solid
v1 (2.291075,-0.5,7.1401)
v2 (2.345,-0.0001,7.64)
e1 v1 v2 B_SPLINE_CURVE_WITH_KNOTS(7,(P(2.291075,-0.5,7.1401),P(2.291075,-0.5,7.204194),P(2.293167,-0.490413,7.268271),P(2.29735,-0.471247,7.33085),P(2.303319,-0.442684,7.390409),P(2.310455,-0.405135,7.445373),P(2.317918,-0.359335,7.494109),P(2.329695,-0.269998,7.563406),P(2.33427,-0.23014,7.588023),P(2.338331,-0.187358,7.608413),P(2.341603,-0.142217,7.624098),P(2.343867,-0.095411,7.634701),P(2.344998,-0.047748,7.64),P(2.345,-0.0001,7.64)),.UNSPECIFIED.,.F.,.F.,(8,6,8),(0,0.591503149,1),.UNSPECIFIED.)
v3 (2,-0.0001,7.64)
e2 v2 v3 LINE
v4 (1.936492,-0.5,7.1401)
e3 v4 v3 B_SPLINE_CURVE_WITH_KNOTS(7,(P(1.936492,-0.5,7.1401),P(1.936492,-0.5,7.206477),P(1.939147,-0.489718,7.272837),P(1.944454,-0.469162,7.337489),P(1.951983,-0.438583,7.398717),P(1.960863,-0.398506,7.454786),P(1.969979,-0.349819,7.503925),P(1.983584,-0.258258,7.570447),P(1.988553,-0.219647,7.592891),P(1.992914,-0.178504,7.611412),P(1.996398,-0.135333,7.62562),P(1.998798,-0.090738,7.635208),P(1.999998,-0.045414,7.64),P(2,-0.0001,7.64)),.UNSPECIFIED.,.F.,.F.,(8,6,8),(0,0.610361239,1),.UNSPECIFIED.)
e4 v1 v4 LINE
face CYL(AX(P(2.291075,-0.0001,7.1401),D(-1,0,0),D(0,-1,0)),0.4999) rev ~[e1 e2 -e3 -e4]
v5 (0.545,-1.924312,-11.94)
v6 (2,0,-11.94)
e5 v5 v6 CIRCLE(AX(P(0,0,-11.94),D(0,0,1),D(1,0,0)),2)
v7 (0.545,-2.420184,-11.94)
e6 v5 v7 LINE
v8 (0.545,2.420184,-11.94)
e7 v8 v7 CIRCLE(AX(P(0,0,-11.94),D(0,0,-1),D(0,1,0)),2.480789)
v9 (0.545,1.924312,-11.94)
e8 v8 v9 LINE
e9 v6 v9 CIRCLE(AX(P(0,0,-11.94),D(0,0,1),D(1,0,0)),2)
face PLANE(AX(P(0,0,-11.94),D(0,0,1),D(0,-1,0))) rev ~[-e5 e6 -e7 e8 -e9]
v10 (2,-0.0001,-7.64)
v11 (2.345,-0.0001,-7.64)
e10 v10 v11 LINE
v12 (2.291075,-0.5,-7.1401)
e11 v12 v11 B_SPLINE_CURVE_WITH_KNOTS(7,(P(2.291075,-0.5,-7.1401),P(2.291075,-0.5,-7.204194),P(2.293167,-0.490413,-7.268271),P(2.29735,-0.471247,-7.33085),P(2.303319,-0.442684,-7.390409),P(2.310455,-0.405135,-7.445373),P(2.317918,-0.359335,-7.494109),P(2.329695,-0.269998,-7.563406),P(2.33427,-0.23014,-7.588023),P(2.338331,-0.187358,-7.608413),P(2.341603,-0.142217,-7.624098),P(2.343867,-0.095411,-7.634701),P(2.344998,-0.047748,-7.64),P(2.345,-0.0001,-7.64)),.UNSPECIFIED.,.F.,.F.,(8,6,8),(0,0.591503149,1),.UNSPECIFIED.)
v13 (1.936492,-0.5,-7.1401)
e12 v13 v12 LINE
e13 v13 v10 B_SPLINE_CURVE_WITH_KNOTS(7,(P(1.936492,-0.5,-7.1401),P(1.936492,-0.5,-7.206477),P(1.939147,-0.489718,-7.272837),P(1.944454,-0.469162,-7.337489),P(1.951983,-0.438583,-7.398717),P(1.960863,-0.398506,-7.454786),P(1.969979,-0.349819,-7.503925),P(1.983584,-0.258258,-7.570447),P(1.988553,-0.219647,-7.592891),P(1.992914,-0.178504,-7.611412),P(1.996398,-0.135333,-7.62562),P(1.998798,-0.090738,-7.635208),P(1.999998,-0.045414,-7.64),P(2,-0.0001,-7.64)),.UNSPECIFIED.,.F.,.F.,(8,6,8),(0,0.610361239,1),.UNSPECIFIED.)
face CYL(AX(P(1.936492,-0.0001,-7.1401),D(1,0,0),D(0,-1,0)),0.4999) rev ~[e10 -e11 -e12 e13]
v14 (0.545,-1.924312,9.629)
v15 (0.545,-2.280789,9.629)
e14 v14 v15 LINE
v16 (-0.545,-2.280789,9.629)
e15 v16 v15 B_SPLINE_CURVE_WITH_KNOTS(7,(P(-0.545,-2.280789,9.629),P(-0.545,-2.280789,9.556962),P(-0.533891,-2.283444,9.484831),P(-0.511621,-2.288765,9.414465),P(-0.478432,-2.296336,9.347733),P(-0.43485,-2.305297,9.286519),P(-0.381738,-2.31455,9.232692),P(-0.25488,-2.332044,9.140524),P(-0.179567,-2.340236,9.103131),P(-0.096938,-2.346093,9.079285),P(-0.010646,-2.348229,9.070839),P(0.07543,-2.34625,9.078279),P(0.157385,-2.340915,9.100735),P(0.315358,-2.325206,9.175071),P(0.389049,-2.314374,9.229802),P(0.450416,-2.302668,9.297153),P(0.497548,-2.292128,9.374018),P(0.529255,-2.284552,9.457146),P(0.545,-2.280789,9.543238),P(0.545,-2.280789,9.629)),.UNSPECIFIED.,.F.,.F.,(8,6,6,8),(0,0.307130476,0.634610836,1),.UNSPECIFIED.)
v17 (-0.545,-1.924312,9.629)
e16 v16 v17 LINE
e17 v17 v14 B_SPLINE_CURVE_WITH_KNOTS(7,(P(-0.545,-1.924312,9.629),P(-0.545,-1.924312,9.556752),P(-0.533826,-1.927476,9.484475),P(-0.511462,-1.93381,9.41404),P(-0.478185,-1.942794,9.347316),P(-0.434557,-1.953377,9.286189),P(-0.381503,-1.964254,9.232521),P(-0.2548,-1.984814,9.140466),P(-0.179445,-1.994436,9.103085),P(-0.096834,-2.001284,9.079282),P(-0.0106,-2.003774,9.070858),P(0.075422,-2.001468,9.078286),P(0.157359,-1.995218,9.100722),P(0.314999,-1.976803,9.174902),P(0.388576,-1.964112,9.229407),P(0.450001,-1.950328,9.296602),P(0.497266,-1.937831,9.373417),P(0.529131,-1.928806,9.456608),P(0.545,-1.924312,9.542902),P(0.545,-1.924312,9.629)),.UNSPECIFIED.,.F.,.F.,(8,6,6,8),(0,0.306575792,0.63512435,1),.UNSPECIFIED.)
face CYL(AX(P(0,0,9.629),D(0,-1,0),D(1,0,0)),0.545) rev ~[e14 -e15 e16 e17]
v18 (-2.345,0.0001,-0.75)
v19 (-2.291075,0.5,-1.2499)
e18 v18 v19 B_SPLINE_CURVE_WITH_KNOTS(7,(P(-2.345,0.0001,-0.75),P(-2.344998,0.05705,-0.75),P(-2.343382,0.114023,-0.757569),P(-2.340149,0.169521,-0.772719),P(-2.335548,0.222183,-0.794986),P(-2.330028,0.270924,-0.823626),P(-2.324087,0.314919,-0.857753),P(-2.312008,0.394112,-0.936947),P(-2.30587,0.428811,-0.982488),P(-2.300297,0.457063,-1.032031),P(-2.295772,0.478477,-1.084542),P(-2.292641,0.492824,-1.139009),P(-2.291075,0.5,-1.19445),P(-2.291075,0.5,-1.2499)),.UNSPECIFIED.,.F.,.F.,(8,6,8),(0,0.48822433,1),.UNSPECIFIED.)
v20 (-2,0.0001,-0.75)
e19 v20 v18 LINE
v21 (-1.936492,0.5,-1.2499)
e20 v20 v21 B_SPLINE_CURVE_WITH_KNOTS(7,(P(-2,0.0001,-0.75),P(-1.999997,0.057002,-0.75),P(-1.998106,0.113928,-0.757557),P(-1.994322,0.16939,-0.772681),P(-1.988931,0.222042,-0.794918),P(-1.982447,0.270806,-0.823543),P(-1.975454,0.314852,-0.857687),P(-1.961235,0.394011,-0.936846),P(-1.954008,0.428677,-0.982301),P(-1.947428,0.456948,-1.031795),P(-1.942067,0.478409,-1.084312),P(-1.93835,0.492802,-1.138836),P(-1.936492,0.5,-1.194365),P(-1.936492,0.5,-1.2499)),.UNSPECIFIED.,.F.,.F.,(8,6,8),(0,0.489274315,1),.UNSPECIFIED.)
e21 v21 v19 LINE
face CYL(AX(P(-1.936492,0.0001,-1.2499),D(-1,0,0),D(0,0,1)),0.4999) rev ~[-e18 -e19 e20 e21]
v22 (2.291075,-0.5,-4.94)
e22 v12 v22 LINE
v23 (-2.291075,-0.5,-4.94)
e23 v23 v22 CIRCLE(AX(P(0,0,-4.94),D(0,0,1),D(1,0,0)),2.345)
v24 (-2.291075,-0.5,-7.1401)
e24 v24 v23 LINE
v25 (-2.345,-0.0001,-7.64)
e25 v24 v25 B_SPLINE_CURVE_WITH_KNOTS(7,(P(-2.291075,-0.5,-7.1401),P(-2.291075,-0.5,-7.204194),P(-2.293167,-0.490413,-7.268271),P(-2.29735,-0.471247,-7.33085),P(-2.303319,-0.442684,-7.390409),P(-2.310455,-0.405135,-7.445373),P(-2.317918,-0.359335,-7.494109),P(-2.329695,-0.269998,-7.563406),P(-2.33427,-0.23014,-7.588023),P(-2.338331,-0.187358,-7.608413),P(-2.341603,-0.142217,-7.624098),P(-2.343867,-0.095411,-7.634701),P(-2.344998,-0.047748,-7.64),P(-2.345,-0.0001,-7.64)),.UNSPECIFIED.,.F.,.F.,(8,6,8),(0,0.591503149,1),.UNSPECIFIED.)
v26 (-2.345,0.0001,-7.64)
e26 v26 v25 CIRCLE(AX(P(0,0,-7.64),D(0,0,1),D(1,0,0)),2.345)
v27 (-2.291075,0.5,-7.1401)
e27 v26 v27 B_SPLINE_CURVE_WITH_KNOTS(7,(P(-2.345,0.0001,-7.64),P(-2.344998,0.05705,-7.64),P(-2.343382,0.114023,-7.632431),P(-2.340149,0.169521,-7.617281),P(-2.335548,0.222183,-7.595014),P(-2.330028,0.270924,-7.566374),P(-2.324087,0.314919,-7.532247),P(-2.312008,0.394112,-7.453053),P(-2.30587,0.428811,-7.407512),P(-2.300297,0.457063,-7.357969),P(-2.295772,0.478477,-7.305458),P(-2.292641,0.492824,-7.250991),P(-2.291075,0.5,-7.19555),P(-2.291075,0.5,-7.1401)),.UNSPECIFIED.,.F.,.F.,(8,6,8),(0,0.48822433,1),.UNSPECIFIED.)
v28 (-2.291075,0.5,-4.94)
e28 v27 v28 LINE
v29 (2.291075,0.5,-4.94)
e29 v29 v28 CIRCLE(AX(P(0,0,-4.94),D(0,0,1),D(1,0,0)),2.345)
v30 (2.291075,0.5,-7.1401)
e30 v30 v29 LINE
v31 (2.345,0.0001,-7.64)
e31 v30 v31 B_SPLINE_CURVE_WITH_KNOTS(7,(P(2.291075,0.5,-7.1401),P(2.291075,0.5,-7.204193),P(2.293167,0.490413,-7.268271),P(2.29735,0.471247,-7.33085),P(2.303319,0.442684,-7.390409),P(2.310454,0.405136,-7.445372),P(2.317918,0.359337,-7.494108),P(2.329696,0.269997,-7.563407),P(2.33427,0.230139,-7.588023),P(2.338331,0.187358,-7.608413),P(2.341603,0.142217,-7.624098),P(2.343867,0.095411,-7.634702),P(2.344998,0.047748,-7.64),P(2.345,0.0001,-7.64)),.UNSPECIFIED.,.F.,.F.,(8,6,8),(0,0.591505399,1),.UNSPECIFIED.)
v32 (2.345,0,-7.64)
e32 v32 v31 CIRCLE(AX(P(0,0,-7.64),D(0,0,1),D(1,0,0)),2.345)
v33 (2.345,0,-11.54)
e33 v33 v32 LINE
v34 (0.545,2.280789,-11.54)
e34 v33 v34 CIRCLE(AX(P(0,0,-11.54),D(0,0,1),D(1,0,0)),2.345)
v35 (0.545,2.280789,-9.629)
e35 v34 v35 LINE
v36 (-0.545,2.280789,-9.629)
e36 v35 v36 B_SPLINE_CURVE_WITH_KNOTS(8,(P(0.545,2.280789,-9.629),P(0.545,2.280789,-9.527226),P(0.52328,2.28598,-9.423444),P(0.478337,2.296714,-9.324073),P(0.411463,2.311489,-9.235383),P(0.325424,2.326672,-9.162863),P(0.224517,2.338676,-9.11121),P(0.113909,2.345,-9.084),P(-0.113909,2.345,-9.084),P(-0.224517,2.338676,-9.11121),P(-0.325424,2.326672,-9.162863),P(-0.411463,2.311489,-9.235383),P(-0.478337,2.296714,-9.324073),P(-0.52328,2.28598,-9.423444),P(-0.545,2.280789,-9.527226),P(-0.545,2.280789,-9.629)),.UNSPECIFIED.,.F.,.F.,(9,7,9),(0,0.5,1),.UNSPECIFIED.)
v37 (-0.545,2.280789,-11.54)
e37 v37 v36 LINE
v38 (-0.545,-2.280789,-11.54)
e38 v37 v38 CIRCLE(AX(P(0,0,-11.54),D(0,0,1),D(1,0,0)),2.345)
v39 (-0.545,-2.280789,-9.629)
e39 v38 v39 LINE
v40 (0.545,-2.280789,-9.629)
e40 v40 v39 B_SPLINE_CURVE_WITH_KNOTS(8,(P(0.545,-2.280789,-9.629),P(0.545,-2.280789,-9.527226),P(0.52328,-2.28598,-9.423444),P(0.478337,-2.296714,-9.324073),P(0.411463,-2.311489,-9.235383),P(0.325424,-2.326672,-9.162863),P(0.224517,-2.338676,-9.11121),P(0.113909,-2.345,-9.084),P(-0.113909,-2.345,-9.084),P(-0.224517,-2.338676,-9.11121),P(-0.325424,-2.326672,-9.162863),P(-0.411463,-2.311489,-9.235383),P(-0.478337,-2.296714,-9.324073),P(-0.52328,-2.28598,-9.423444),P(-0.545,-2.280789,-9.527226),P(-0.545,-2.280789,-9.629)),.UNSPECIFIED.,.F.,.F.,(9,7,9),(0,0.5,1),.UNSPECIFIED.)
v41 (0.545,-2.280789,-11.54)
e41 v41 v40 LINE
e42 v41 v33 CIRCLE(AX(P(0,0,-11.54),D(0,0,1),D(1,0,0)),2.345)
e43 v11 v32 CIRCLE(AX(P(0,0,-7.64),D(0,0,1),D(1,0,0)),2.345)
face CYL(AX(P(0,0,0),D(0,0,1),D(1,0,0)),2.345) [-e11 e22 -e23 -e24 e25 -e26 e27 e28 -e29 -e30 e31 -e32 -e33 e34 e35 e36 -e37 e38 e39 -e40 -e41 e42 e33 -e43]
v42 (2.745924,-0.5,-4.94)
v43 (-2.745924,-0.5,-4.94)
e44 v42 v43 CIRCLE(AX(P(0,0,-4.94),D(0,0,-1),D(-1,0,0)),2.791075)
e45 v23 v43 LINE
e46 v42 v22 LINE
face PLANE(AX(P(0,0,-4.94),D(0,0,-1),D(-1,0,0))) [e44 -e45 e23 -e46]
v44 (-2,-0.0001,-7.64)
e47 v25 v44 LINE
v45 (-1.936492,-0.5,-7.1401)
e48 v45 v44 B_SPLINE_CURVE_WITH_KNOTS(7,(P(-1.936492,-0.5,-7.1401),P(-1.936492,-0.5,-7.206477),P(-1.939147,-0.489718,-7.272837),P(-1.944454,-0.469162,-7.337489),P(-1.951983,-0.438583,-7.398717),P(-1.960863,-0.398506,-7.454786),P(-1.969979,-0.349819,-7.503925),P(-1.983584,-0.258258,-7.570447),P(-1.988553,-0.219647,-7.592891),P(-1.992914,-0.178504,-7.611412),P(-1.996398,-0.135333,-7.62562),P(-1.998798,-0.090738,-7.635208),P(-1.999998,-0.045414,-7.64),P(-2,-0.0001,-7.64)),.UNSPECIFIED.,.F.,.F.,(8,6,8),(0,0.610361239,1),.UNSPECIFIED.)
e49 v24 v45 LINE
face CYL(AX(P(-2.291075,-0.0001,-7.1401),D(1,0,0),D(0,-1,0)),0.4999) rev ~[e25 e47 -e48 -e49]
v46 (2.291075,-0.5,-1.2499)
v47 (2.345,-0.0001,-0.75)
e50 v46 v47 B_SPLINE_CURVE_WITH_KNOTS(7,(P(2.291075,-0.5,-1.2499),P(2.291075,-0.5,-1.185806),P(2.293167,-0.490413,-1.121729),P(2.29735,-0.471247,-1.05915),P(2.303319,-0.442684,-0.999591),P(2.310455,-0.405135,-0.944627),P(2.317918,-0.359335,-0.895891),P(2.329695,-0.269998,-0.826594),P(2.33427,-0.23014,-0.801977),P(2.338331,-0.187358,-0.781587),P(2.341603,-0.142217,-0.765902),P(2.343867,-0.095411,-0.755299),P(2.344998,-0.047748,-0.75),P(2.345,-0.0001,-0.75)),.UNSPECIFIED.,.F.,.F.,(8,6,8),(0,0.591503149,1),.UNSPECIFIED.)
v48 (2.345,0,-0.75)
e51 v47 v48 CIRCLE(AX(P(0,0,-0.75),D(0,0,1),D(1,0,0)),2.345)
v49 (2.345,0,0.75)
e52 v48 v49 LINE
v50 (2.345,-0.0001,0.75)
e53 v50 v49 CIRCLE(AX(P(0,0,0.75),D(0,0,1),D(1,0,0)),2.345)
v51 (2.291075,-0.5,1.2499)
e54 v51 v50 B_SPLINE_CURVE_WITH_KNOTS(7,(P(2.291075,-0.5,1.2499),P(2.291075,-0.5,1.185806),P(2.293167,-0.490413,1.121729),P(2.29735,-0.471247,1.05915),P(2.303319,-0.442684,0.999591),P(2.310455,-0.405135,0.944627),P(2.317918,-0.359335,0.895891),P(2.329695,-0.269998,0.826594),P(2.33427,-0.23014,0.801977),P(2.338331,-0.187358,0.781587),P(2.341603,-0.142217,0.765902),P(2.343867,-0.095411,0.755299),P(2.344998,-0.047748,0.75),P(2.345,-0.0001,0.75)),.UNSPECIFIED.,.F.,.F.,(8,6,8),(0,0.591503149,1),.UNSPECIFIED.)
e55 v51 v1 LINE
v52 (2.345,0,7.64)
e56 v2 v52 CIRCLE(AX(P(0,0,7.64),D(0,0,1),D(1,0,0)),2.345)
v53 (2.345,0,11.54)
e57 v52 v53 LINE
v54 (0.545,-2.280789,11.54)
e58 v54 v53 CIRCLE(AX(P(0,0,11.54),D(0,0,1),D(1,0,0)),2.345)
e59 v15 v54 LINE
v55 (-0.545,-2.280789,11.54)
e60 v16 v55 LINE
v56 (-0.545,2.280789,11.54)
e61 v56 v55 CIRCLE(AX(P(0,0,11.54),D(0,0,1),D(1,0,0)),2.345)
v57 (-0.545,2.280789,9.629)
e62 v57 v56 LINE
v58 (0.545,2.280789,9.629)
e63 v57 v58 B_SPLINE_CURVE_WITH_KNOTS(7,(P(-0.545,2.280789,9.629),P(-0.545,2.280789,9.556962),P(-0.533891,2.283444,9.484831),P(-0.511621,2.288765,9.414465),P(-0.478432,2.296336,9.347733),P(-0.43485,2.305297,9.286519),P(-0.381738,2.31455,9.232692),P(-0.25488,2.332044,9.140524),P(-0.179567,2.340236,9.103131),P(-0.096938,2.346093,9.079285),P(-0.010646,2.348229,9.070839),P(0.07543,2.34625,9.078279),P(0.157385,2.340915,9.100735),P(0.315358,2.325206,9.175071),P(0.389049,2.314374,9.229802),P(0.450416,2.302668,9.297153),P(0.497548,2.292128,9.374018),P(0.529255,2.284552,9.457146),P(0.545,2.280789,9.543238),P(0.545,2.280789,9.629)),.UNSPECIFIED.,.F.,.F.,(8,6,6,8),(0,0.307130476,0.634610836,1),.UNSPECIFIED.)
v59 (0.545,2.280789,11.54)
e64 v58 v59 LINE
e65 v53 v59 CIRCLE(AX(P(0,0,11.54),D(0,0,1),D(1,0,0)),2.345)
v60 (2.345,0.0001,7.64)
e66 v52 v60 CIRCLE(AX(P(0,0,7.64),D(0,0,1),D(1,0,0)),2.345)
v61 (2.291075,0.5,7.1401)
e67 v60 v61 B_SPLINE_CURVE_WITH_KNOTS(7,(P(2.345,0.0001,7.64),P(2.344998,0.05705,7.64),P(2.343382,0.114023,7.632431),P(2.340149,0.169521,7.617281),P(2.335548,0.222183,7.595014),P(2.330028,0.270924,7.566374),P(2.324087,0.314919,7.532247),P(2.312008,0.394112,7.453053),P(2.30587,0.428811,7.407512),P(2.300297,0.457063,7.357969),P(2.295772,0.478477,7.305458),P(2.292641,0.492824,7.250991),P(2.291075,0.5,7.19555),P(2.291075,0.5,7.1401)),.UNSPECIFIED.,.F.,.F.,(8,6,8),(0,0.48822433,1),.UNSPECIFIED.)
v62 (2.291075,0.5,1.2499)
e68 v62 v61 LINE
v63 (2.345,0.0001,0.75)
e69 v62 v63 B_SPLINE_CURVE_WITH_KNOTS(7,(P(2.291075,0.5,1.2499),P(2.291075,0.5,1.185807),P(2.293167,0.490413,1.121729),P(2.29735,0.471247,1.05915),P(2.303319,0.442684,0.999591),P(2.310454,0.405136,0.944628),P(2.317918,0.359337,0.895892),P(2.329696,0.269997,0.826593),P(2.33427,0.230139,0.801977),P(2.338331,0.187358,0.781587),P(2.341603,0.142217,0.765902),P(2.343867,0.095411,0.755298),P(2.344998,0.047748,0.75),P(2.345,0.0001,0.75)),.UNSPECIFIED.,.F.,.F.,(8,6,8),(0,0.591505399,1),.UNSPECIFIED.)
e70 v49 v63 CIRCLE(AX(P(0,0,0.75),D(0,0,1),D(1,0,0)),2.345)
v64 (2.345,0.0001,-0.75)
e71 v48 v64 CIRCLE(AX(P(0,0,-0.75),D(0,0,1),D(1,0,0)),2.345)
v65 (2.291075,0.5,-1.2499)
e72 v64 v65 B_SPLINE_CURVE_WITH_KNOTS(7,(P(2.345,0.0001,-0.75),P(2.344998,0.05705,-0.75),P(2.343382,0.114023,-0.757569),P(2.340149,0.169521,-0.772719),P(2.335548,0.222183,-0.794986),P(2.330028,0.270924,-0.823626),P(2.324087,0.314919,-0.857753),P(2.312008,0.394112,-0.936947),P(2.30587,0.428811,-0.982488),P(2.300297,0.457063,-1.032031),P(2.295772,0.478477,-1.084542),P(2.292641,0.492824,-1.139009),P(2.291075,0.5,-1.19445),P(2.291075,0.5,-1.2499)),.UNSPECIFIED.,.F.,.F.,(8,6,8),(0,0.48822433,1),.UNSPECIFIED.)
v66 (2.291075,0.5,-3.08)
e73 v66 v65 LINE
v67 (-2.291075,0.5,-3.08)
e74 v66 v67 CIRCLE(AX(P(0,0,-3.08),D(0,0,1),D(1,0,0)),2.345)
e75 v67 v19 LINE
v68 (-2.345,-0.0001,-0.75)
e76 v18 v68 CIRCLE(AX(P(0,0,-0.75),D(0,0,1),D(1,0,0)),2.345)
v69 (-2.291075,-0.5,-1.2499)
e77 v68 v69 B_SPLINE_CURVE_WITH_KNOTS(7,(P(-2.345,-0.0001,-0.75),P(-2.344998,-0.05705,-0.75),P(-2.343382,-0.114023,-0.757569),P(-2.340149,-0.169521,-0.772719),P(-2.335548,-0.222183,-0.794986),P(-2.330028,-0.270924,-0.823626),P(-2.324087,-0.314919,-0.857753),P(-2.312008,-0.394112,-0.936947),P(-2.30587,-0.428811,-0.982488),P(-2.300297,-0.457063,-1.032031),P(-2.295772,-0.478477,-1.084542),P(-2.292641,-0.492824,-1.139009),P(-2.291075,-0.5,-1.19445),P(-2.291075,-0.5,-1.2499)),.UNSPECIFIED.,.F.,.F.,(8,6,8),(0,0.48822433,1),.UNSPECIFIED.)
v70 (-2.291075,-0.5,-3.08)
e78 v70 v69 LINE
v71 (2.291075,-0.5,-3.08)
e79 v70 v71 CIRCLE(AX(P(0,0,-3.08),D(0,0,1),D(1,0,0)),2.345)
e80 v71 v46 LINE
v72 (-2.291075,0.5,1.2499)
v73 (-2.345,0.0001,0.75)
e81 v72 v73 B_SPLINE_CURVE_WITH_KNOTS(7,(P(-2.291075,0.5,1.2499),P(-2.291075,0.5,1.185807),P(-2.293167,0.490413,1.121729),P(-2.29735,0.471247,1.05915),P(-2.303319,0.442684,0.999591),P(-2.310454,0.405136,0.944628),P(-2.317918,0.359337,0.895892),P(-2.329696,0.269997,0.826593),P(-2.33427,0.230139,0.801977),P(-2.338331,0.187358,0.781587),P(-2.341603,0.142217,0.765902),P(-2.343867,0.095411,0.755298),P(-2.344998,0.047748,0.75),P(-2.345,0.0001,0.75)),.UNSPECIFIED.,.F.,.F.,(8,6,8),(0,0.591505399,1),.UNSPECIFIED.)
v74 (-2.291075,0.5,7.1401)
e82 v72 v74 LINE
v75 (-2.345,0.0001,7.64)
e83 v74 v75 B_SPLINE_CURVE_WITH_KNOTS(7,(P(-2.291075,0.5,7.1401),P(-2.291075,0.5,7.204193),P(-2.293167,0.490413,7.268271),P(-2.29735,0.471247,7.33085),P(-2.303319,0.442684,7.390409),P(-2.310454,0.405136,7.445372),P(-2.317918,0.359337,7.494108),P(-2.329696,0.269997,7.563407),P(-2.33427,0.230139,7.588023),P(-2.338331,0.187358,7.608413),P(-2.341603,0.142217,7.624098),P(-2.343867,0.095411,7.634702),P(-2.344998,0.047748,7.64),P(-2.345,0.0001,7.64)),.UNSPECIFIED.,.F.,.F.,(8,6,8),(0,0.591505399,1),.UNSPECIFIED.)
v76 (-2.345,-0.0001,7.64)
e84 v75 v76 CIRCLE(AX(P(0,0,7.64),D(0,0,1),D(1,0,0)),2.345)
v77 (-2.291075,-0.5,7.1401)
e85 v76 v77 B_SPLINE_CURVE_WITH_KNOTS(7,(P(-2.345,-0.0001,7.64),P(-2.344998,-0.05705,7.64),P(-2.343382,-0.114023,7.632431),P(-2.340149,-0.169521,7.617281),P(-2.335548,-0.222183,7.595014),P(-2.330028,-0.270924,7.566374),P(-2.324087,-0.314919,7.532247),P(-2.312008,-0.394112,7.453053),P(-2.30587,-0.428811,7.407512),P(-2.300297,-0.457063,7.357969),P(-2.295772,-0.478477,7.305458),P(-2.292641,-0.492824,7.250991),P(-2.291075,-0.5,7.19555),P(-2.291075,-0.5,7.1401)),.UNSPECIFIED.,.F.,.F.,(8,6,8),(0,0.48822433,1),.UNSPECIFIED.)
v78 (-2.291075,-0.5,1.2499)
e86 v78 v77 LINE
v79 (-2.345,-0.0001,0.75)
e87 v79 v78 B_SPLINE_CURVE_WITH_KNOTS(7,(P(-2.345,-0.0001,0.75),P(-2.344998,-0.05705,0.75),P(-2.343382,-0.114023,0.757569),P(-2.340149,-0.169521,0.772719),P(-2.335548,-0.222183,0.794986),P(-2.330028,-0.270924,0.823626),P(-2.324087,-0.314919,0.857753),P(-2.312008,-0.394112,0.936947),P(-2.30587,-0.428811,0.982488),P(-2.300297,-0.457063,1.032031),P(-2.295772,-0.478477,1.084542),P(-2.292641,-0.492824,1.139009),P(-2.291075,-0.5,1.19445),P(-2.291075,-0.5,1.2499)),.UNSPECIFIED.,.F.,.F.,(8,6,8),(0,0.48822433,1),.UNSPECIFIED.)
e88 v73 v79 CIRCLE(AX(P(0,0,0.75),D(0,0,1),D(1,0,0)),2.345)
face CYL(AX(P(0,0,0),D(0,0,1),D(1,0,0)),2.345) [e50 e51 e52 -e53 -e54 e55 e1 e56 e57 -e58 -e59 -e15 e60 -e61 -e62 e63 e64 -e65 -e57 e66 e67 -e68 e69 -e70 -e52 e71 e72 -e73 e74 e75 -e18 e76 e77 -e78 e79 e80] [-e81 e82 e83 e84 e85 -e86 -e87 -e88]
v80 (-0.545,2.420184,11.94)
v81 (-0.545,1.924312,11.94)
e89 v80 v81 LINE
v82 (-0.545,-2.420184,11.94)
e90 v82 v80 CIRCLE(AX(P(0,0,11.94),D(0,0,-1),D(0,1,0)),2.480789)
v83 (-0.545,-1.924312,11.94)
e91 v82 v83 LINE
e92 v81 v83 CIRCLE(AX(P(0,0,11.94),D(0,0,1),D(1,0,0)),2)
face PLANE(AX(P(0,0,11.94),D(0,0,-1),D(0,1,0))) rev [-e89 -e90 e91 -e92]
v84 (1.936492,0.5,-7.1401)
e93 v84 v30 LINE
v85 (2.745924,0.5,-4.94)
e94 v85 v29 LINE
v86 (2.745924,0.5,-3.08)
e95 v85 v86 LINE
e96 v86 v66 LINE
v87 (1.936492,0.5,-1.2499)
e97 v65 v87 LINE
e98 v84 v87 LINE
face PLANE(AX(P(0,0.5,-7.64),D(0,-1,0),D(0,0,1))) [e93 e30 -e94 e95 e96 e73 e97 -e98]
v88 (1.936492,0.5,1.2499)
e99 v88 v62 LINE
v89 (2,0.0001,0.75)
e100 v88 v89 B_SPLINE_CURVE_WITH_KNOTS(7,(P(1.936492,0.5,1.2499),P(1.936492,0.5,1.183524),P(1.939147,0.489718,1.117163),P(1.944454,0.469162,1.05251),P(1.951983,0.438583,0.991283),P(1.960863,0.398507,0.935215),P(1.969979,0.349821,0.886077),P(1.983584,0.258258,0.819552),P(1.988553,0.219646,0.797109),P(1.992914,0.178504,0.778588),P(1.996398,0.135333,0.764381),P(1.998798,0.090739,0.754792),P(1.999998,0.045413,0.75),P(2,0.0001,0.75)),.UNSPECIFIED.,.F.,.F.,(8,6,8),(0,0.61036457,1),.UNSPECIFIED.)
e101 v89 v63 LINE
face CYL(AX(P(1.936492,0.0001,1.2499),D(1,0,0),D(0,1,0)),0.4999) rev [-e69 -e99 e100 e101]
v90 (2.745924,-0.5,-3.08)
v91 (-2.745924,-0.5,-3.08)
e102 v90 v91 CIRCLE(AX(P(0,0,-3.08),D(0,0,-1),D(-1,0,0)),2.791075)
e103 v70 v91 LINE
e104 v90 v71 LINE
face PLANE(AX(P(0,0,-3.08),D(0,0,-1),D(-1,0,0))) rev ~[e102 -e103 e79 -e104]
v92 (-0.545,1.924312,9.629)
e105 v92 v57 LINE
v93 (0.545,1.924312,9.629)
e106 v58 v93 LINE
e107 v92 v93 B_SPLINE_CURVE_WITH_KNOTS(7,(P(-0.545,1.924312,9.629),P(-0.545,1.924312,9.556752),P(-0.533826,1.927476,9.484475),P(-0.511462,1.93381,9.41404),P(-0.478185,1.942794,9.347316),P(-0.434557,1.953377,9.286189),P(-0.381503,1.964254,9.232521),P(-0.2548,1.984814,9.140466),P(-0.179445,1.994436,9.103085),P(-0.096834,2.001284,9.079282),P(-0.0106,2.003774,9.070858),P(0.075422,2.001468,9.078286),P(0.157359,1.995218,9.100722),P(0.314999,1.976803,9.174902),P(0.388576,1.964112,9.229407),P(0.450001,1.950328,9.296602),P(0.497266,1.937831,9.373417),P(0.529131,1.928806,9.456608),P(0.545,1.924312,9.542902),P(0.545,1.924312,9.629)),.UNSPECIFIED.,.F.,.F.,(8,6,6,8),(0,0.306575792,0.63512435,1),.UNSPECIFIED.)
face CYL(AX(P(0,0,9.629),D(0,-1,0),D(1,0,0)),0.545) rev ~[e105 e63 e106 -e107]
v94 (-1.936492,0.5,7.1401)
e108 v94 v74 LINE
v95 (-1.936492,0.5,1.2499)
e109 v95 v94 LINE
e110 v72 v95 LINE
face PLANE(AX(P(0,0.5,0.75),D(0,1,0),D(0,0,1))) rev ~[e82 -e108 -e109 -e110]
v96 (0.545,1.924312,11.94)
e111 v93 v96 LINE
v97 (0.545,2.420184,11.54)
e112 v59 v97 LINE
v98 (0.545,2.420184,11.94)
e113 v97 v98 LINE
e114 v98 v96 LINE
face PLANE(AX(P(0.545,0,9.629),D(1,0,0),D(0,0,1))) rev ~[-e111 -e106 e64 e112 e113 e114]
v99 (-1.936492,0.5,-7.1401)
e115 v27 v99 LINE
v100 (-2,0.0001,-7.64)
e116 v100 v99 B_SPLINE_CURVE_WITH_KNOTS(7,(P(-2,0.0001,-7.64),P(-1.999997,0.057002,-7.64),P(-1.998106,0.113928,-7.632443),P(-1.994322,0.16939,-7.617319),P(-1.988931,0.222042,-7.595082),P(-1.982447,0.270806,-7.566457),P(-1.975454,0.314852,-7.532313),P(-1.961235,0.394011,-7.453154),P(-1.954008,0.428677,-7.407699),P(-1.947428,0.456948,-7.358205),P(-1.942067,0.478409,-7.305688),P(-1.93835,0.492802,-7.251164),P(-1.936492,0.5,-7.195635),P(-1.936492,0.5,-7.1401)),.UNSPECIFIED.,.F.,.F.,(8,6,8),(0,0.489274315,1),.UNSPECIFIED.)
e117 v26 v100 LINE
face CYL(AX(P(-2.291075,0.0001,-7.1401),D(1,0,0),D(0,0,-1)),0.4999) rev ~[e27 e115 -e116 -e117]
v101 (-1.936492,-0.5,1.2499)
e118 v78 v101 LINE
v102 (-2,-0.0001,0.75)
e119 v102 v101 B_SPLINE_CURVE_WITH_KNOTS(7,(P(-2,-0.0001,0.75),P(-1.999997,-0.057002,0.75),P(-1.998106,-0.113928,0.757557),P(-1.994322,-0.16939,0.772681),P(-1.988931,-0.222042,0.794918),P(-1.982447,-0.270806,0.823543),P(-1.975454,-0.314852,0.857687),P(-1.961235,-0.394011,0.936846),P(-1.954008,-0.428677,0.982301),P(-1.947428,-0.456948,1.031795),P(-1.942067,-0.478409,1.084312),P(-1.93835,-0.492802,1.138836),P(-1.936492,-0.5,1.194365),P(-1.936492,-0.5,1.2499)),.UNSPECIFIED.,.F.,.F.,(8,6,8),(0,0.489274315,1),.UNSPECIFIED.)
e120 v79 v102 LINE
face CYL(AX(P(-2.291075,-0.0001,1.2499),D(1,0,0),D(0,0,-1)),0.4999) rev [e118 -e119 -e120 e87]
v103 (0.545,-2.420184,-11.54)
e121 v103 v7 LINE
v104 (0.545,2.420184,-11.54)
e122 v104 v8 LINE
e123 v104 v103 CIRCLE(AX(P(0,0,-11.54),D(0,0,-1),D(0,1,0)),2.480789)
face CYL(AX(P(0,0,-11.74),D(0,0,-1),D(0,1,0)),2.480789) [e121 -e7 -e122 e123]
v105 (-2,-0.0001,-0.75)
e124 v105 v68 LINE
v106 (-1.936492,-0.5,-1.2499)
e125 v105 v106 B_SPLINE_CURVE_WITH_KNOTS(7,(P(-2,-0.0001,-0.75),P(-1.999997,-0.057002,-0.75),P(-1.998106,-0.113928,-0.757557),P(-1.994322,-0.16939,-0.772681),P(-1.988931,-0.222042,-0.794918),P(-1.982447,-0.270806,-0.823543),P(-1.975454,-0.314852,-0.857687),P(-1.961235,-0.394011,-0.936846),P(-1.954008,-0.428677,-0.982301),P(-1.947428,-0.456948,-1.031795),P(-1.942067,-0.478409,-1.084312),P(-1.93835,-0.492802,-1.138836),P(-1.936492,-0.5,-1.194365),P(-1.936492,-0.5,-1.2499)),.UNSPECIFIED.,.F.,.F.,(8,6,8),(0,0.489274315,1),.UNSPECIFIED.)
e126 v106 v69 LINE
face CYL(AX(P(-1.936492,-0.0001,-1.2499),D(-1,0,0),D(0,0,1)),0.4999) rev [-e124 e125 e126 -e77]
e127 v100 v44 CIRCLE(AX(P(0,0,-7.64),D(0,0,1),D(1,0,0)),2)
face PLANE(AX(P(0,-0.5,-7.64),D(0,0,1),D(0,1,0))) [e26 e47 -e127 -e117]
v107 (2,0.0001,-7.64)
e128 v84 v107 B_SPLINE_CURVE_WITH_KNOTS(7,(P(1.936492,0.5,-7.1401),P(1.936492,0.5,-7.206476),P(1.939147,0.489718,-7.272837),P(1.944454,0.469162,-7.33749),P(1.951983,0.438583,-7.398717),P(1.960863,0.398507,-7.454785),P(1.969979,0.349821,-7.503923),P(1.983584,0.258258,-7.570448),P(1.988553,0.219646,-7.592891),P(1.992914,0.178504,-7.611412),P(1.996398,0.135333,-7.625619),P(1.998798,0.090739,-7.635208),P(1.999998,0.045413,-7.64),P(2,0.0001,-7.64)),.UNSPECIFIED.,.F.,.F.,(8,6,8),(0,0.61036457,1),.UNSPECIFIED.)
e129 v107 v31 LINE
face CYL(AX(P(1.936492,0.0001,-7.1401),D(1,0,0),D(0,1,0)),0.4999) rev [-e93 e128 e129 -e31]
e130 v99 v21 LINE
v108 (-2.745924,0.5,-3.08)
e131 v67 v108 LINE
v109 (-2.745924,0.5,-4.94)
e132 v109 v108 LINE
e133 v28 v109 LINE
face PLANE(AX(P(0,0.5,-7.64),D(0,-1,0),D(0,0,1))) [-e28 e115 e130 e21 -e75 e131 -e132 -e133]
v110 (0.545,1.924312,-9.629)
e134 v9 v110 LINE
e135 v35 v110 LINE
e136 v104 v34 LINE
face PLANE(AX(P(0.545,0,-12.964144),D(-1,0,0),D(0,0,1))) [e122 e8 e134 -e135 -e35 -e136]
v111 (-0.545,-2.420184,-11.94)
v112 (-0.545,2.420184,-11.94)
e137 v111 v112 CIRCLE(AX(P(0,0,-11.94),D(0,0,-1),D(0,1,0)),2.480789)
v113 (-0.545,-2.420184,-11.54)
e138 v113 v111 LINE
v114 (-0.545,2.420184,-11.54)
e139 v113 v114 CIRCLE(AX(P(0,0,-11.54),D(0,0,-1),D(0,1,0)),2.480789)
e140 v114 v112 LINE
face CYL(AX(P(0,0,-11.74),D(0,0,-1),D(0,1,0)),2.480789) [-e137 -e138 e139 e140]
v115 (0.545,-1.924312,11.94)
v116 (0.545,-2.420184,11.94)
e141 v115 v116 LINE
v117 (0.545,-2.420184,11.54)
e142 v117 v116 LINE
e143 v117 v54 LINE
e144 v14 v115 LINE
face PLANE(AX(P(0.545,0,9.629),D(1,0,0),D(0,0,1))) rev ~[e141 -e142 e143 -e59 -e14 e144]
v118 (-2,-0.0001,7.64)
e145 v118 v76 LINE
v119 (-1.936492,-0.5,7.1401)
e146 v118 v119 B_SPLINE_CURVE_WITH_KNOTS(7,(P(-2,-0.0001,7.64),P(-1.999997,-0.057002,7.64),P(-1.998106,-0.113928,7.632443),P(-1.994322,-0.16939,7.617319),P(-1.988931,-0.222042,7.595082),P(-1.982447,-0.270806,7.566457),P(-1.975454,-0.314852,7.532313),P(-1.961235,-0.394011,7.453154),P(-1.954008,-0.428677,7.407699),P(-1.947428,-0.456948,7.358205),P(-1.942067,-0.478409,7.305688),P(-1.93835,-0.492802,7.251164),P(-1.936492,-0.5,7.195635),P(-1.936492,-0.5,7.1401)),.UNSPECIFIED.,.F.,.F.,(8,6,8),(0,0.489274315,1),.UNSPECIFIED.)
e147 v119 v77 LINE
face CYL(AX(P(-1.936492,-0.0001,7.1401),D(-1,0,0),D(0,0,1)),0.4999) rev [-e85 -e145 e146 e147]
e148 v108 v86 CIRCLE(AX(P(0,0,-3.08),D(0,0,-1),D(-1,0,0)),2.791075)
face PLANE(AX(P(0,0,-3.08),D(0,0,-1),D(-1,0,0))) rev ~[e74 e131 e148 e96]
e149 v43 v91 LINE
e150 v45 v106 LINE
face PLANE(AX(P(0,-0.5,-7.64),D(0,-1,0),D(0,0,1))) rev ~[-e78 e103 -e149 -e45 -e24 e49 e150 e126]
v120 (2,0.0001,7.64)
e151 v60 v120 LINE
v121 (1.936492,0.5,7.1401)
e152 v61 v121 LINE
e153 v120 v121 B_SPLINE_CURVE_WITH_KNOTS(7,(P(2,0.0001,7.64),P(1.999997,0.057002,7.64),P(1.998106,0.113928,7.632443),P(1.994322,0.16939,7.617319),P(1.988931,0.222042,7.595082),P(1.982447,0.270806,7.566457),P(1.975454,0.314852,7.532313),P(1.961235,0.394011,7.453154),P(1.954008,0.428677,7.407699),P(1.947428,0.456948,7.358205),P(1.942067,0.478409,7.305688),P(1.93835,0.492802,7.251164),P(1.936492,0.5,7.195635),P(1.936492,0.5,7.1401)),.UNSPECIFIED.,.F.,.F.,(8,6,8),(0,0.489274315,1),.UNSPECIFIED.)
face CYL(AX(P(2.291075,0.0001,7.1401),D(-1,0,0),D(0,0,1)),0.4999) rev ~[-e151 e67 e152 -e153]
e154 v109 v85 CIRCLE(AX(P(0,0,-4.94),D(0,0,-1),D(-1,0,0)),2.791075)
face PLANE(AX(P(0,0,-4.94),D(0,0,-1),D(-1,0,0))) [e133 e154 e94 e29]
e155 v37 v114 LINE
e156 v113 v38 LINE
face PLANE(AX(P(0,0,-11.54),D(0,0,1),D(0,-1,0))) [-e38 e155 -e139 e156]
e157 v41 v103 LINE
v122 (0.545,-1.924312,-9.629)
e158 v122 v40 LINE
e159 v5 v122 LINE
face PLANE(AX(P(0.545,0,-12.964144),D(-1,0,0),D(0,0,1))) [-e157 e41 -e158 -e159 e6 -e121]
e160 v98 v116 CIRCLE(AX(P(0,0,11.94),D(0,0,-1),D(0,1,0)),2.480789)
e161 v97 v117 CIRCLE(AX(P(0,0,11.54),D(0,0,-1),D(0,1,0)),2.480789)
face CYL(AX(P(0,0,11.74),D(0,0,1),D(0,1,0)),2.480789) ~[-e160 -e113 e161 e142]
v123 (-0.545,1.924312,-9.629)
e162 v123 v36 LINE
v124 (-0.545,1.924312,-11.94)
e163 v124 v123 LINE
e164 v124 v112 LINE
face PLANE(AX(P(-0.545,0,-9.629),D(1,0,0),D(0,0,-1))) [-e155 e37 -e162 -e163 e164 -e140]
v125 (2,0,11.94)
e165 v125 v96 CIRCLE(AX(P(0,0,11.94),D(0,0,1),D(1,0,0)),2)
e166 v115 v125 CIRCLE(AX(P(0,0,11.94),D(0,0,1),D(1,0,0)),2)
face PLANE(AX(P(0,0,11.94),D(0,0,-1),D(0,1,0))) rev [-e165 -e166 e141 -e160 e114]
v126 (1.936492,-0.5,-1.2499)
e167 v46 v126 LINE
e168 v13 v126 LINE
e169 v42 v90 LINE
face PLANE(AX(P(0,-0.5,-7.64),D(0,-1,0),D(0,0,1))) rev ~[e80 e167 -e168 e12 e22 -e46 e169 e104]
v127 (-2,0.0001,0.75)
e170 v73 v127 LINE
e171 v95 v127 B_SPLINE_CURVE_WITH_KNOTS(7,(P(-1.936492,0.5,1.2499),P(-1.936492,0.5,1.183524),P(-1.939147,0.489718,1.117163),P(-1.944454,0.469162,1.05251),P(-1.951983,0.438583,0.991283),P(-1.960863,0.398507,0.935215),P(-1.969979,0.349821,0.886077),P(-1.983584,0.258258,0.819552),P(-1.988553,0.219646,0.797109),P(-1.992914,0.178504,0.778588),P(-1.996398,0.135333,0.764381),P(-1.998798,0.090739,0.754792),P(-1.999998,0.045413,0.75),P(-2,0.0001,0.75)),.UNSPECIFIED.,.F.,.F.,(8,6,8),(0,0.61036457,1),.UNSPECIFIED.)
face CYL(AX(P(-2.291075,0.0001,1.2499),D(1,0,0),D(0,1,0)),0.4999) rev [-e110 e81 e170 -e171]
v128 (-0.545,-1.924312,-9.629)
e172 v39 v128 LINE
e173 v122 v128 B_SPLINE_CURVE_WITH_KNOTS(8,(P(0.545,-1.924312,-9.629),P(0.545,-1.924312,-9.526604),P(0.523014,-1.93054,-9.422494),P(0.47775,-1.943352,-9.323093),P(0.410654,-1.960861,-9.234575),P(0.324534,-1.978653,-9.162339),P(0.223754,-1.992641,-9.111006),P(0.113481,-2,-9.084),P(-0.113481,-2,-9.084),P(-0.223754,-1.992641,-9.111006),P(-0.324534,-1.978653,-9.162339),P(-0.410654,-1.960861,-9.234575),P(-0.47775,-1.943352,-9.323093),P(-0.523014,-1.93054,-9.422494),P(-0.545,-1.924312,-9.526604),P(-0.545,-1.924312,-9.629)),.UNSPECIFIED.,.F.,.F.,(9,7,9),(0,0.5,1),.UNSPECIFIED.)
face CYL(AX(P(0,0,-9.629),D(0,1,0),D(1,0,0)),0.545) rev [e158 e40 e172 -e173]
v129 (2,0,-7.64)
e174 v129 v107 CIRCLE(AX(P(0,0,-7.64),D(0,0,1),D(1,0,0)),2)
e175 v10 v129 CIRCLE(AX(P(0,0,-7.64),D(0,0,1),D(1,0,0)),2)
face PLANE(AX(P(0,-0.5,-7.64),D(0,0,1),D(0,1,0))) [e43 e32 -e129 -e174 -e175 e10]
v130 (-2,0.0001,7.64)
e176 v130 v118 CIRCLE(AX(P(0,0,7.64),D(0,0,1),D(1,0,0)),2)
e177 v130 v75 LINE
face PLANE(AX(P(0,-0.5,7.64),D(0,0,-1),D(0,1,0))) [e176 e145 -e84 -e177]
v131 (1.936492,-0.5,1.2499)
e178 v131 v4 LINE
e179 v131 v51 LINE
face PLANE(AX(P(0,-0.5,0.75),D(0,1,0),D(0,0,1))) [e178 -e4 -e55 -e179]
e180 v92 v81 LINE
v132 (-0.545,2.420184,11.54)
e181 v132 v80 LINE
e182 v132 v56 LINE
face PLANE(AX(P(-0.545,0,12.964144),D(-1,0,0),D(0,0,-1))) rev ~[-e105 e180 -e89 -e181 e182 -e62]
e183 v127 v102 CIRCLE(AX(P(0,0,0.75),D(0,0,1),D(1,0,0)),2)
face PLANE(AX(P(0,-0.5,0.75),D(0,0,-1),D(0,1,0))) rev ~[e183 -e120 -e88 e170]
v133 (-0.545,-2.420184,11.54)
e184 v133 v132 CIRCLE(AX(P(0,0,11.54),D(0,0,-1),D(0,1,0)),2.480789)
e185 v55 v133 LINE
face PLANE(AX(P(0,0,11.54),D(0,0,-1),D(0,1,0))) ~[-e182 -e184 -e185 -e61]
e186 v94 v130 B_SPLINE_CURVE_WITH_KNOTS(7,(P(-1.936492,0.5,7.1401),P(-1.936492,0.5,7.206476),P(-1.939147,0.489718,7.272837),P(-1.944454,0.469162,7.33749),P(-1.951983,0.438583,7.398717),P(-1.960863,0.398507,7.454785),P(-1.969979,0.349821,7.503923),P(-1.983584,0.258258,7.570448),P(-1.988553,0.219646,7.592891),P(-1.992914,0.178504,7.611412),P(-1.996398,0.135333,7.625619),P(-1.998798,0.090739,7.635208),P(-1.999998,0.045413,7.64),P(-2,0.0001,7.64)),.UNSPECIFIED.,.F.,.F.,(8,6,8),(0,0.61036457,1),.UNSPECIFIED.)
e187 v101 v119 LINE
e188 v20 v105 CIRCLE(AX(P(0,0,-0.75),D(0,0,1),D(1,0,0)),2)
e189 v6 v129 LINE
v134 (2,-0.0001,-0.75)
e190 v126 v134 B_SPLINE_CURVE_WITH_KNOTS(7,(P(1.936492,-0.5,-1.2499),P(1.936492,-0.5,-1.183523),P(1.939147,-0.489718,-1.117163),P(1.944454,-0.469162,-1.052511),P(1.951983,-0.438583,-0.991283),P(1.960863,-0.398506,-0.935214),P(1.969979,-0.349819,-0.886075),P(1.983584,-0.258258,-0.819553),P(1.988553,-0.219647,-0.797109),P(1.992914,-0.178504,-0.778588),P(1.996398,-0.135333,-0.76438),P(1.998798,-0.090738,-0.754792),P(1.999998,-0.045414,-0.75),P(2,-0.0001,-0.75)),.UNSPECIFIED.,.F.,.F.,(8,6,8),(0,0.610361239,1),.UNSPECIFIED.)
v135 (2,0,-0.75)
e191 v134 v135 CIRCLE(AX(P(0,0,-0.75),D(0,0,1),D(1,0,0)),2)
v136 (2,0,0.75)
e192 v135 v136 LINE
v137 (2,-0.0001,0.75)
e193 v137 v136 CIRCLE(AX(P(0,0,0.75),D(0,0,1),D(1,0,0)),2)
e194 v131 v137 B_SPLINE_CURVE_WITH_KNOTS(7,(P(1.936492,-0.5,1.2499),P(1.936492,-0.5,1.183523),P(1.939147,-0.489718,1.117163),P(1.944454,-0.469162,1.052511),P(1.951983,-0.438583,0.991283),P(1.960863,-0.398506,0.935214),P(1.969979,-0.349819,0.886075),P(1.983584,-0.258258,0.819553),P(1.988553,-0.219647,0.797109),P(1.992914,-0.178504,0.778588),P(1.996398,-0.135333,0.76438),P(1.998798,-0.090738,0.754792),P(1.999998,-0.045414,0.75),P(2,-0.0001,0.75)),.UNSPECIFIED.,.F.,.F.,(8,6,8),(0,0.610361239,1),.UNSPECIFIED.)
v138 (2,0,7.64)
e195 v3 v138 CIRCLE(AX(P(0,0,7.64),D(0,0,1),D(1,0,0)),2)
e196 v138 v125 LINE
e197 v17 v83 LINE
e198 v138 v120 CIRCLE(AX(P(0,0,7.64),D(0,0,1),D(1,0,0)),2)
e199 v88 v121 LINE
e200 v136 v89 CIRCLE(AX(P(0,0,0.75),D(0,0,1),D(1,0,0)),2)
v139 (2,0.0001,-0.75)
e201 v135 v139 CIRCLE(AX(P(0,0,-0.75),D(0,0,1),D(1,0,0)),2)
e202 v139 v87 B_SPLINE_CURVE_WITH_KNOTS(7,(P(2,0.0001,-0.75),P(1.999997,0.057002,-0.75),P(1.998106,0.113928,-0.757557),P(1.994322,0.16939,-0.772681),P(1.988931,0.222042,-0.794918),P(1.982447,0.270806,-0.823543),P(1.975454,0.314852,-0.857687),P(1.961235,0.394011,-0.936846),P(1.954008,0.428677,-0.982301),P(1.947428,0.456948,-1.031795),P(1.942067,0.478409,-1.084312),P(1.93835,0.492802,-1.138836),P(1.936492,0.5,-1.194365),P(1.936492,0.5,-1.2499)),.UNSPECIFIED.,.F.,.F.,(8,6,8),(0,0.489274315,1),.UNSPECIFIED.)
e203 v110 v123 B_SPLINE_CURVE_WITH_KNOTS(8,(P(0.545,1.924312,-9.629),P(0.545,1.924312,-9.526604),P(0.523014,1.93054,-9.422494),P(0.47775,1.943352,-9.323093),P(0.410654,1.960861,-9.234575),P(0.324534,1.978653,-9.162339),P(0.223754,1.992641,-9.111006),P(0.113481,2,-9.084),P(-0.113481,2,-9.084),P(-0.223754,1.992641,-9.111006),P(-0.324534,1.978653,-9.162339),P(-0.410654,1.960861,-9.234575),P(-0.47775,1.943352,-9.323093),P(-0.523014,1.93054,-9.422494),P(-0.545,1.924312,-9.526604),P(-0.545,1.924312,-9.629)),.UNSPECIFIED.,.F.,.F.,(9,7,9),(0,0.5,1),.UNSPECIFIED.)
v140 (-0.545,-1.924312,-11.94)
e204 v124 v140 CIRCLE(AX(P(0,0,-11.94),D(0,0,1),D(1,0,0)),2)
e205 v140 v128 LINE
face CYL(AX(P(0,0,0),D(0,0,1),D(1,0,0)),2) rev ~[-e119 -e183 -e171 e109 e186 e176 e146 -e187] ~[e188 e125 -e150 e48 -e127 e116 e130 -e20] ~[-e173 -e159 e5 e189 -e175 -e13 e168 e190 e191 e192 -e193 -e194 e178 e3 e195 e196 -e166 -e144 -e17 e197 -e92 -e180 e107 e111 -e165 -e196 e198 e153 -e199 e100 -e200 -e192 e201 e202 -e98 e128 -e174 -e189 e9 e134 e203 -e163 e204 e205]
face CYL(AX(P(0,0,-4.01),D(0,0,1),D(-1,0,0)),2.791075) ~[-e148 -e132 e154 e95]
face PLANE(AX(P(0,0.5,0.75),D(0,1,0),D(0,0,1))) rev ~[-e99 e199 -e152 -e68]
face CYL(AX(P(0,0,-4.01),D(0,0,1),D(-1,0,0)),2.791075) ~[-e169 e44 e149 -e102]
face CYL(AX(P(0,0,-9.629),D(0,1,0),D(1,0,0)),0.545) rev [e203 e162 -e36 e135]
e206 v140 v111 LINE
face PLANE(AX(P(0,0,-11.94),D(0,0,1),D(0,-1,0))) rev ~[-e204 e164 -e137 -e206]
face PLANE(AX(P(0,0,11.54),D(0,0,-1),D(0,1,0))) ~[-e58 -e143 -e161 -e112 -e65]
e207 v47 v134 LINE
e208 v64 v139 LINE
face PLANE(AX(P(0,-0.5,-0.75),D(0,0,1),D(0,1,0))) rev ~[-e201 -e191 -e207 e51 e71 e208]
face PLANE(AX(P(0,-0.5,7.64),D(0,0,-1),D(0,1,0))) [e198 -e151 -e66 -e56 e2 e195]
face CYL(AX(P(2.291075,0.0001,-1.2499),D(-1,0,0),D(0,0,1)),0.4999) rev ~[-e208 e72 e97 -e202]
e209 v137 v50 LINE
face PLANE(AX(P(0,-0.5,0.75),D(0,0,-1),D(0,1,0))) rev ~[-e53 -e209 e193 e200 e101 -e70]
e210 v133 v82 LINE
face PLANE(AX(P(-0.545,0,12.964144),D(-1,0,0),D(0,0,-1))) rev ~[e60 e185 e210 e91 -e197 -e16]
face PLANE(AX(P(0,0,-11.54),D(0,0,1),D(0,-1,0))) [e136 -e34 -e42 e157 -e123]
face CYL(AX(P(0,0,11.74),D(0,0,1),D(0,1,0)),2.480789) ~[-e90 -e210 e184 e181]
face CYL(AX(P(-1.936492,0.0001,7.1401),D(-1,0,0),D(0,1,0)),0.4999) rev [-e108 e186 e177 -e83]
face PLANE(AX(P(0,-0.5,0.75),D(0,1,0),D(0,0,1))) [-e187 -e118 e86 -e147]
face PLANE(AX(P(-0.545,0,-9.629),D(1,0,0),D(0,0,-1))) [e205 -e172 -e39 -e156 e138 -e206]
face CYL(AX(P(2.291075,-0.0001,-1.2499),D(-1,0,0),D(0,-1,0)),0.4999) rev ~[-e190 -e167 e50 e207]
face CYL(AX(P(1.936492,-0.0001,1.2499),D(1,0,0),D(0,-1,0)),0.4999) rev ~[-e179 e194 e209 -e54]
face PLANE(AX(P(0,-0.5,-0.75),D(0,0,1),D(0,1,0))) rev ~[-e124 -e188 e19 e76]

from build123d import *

# Parameters (mm, degrees)
F0_R      = 2.345
F1_DEPTH  = 11.94
F2_DEPTH  = 11.94
F5_DEPTH  = 166.5
F6_DEPTH  = 12.5
F7_W      = 0.5
F7_H      = 1.86
F4_W      = 1
F4_H      = 6.89
F9_DEPTH  = 12.5
F10_R     = 2
F11_DEPTH = 20.5
F12_W     = 0.2
F12_H     = 0.4
F14_DEPTH = 12.5
F15_DEPTH = 25
F16_DEPTH = 12.5
F17_R     = 0.4999


# Not quite as in the source:
# - a fillet or chamfer is up to 0.001 mm smaller than in the source, because OpenCascade refuses the exact size
# - a pattern or mirror of a feature is missing from the dataset's text; its kind, count and spacing are read off the source's solid


with BuildPart() as f1:
    # F0 (on Top) → F1 (new body)
    with BuildSketch(Plane.XY):
        Circle(F0_R)
    extrude(amount=F1_DEPTH)

    # F0 (on Top) → F2 (join)
    with BuildSketch(Plane.XY):
        Circle(F0_R)
    extrude(amount=-F2_DEPTH)

    # F3 (on Front) → F5 (cut, symmetric)
    with BuildSketch(Plane.XZ):
        with BuildLine():
            Line((-0.545, -12.9641438561), (0.545, -12.9641438561))
            Line((0.545, -12.9641438561), (0.545, -9.629))
            ThreePointArc((0.545, -9.629), (0, -10.174), (-0.545, -9.629))
            Line((-0.545, -9.629), (-0.545, -12.9641438561))
        make_face()
        with BuildLine():
            ThreePointArc((-0.545, -9.629), (0, -10.174), (0.545, -9.629))
            Line((0.545, -9.629), (-0.545, -9.629))
        make_face()
        with BuildLine():
            Line((-0.545, -9.629), (0.545, -9.629))
            ThreePointArc((0.545, -9.629), (0, -9.084), (-0.545, -9.629))
        make_face()
        with BuildLine():
            ThreePointArc((-0.545, 9.629), (0, 9.084), (0.545, 9.629))
            ThreePointArc((0.545, 9.629), (0, 10.174), (-0.545, 9.629))
        make_face()
        with BuildLine():
            ThreePointArc((-0.545, 9.629), (0, 10.174), (0.545, 9.629))
            Line((0.545, 9.629), (0.545, 12.9641438561))
            Line((0.545, 12.9641438561), (-0.545, 12.9641438561))
            Line((-0.545, 12.9641438561), (-0.545, 9.629))
        make_face()
    extrude(amount=F5_DEPTH, both=True, mode=Mode.SUBTRACT)

    # F3 (on Front) → F6 (cut, symmetric)
    with BuildSketch(Plane.XZ):
        with BuildLine():
            Line((-0.545, -12.9641438561), (0.545, -12.9641438561))
            Line((0.545, -12.9641438561), (0.545, -9.629))
            ThreePointArc((0.545, -9.629), (0, -10.174), (-0.545, -9.629))
            Line((-0.545, -9.629), (-0.545, -12.9641438561))
        make_face()
        with BuildLine():
            ThreePointArc((-0.545, -9.629), (0, -10.174), (0.545, -9.629))
            Line((0.545, -9.629), (-0.545, -9.629))
        make_face()
        with BuildLine():
            Line((-0.545, -9.629), (0.545, -9.629))
            ThreePointArc((0.545, -9.629), (0, -9.084), (-0.545, -9.629))
        make_face()
        with BuildLine():
            ThreePointArc((-0.545, 9.629), (0, 9.084), (0.545, 9.629))
            ThreePointArc((0.545, 9.629), (0, 10.174), (-0.545, 9.629))
        make_face()
        with BuildLine():
            ThreePointArc((-0.545, 9.629), (0, 10.174), (0.545, 9.629))
            Line((0.545, 9.629), (0.545, 12.9641438561))
            Line((0.545, 12.9641438561), (-0.545, 12.9641438561))
            Line((-0.545, 12.9641438561), (-0.545, 9.629))
        make_face()
    extrude(amount=F6_DEPTH, both=True, mode=Mode.SUBTRACT)

    # F7 (on Front) → F8 (revolve)
    with BuildSketch(Plane.XZ):
        with Locations((-2.5410750752, -4.01)):
            Rectangle(F7_W, F7_H)
    revolve(axis=Axis((0, 0, 0), (0, 0, -1)))

    # F4 (on Right) → F9 (cut, symmetric)
    with BuildSketch(Plane.YZ):
        with Locations((0, -4.195)):
            Rectangle(F4_W, F4_H)
        with Locations((0, 4.195)):
            Rectangle(F4_W, F4_H)
    extrude(amount=F9_DEPTH, both=True, mode=Mode.SUBTRACT)

    # F10 (on Top) → F11 (cut, symmetric)
    with BuildSketch(Plane.XY):
        Circle(F10_R)
    extrude(amount=F11_DEPTH, both=True, mode=Mode.SUBTRACT)

    # F12 (on Right) → F13 (revolve)
    with BuildSketch(Plane.YZ):
        with Locations((2.380789337, 11.74)):
            Rectangle(F12_W, F12_H)
    f13 = revolve(axis=Axis((0, 0, 0), (0, 0, -1)))

    # F13_copies: F13 across plane
    add(f13.mirror(Plane(origin=(0, 0, 0), x_dir=(-1, 0, 0), z_dir=(0, 0, -1))))

    # F3 (on Front) → F14 (cut, symmetric)
    with BuildSketch(Plane.XZ):
        with BuildLine():
            Line((-0.545, -12.9641438561), (0.545, -12.9641438561))
            Line((0.545, -12.9641438561), (0.545, -9.629))
            ThreePointArc((0.545, -9.629), (0, -10.174), (-0.545, -9.629))
            Line((-0.545, -9.629), (-0.545, -12.9641438561))
        make_face()
        with BuildLine():
            ThreePointArc((-0.545, -9.629), (0, -10.174), (0.545, -9.629))
            Line((0.545, -9.629), (-0.545, -9.629))
        make_face()
        with BuildLine():
            Line((-0.545, -9.629), (0.545, -9.629))
            ThreePointArc((0.545, -9.629), (0, -9.084), (-0.545, -9.629))
        make_face()
        with BuildLine():
            ThreePointArc((-0.545, 9.629), (0, 9.084), (0.545, 9.629))
            ThreePointArc((0.545, 9.629), (0, 10.174), (-0.545, 9.629))
        make_face()
        with BuildLine():
            ThreePointArc((-0.545, 9.629), (0, 10.174), (0.545, 9.629))
            Line((0.545, 9.629), (0.545, 12.9641438561))
            Line((0.545, 12.9641438561), (-0.545, 12.9641438561))
            Line((-0.545, 12.9641438561), (-0.545, 9.629))
        make_face()
    extrude(amount=F14_DEPTH, both=True, mode=Mode.SUBTRACT)

    # F3 (on Front) → F15 (cut)
    with BuildSketch(Plane.XZ):
        with BuildLine():
            Line((-0.545, -12.9641438561), (0.545, -12.9641438561))
            Line((0.545, -12.9641438561), (0.545, -9.629))
            ThreePointArc((0.545, -9.629), (0, -10.174), (-0.545, -9.629))
            Line((-0.545, -9.629), (-0.545, -12.9641438561))
        make_face()
        with BuildLine():
            ThreePointArc((-0.545, -9.629), (0, -10.174), (0.545, -9.629))
            Line((0.545, -9.629), (-0.545, -9.629))
        make_face()
        with BuildLine():
            Line((-0.545, -9.629), (0.545, -9.629))
            ThreePointArc((0.545, -9.629), (0, -9.084), (-0.545, -9.629))
        make_face()
        with BuildLine():
            ThreePointArc((-0.545, 9.629), (0, 9.084), (0.545, 9.629))
            ThreePointArc((0.545, 9.629), (0, 10.174), (-0.545, 9.629))
        make_face()
        with BuildLine():
            ThreePointArc((-0.545, 9.629), (0, 10.174), (0.545, 9.629))
            Line((0.545, 9.629), (0.545, 12.9641438561))
            Line((0.545, 12.9641438561), (-0.545, 12.9641438561))
            Line((-0.545, 12.9641438561), (-0.545, 9.629))
        make_face()
    extrude(amount=-F15_DEPTH, mode=Mode.SUBTRACT)

    # F3 (on Front) → F16 (cut, symmetric)
    with BuildSketch(Plane.XZ):
        with BuildLine():
            Line((-0.545, -12.9641438561), (0.545, -12.9641438561))
            Line((0.545, -12.9641438561), (0.545, -9.629))
            ThreePointArc((0.545, -9.629), (0, -10.174), (-0.545, -9.629))
            Line((-0.545, -9.629), (-0.545, -12.9641438561))
        make_face()
        with BuildLine():
            ThreePointArc((-0.545, -9.629), (0, -10.174), (0.545, -9.629))
            Line((0.545, -9.629), (-0.545, -9.629))
        make_face()
        with BuildLine():
            Line((-0.545, -9.629), (0.545, -9.629))
            ThreePointArc((0.545, -9.629), (0, -9.084), (-0.545, -9.629))
        make_face()
        with BuildLine():
            ThreePointArc((-0.545, 9.629), (0, 9.084), (0.545, 9.629))
            ThreePointArc((0.545, 9.629), (0, 10.174), (-0.545, 9.629))
        make_face()
        with BuildLine():
            ThreePointArc((-0.545, 9.629), (0, 10.174), (0.545, 9.629))
            Line((0.545, 9.629), (0.545, 12.9641438561))
            Line((0.545, 12.9641438561), (-0.545, 12.9641438561))
            Line((-0.545, 12.9641438561), (-0.545, 9.629))
        make_face()
    extrude(amount=F16_DEPTH, both=True, mode=Mode.SUBTRACT)

    # F17 (radius 0.5 in the source; OpenCascade refuses exactly that, so slightly less here)
    f17_edges = [f1.edges().sort_by_distance(p)[0] for p in [
        (2.113783, 0.5, 0.75),
        (-2.113783, 0.5, 0.75),
        (2.113783, -0.5, 0.75),
        (-2.113783, -0.5, 0.75),
        (2.113783, -0.5, -0.75),
        (-2.113783, -0.5, -0.75),
        (2.113783, 0.5, -0.75),
        (-2.113783, 0.5, -0.75),
        (-2.113783, -0.5, -7.64),
        (2.113783, -0.5, -7.64),
        (2.113783, 0.5, -7.64),
        (-2.113783, 0.5, -7.64),
        (2.113783, -0.5, 7.64),
        (-2.113783, -0.5, 7.64),
        (2.113783, 0.5, 7.64),
        (-2.113783, 0.5, 7.64),
    ]]
    fillet(f17_edges, radius=F17_R)


solid = f1.part
